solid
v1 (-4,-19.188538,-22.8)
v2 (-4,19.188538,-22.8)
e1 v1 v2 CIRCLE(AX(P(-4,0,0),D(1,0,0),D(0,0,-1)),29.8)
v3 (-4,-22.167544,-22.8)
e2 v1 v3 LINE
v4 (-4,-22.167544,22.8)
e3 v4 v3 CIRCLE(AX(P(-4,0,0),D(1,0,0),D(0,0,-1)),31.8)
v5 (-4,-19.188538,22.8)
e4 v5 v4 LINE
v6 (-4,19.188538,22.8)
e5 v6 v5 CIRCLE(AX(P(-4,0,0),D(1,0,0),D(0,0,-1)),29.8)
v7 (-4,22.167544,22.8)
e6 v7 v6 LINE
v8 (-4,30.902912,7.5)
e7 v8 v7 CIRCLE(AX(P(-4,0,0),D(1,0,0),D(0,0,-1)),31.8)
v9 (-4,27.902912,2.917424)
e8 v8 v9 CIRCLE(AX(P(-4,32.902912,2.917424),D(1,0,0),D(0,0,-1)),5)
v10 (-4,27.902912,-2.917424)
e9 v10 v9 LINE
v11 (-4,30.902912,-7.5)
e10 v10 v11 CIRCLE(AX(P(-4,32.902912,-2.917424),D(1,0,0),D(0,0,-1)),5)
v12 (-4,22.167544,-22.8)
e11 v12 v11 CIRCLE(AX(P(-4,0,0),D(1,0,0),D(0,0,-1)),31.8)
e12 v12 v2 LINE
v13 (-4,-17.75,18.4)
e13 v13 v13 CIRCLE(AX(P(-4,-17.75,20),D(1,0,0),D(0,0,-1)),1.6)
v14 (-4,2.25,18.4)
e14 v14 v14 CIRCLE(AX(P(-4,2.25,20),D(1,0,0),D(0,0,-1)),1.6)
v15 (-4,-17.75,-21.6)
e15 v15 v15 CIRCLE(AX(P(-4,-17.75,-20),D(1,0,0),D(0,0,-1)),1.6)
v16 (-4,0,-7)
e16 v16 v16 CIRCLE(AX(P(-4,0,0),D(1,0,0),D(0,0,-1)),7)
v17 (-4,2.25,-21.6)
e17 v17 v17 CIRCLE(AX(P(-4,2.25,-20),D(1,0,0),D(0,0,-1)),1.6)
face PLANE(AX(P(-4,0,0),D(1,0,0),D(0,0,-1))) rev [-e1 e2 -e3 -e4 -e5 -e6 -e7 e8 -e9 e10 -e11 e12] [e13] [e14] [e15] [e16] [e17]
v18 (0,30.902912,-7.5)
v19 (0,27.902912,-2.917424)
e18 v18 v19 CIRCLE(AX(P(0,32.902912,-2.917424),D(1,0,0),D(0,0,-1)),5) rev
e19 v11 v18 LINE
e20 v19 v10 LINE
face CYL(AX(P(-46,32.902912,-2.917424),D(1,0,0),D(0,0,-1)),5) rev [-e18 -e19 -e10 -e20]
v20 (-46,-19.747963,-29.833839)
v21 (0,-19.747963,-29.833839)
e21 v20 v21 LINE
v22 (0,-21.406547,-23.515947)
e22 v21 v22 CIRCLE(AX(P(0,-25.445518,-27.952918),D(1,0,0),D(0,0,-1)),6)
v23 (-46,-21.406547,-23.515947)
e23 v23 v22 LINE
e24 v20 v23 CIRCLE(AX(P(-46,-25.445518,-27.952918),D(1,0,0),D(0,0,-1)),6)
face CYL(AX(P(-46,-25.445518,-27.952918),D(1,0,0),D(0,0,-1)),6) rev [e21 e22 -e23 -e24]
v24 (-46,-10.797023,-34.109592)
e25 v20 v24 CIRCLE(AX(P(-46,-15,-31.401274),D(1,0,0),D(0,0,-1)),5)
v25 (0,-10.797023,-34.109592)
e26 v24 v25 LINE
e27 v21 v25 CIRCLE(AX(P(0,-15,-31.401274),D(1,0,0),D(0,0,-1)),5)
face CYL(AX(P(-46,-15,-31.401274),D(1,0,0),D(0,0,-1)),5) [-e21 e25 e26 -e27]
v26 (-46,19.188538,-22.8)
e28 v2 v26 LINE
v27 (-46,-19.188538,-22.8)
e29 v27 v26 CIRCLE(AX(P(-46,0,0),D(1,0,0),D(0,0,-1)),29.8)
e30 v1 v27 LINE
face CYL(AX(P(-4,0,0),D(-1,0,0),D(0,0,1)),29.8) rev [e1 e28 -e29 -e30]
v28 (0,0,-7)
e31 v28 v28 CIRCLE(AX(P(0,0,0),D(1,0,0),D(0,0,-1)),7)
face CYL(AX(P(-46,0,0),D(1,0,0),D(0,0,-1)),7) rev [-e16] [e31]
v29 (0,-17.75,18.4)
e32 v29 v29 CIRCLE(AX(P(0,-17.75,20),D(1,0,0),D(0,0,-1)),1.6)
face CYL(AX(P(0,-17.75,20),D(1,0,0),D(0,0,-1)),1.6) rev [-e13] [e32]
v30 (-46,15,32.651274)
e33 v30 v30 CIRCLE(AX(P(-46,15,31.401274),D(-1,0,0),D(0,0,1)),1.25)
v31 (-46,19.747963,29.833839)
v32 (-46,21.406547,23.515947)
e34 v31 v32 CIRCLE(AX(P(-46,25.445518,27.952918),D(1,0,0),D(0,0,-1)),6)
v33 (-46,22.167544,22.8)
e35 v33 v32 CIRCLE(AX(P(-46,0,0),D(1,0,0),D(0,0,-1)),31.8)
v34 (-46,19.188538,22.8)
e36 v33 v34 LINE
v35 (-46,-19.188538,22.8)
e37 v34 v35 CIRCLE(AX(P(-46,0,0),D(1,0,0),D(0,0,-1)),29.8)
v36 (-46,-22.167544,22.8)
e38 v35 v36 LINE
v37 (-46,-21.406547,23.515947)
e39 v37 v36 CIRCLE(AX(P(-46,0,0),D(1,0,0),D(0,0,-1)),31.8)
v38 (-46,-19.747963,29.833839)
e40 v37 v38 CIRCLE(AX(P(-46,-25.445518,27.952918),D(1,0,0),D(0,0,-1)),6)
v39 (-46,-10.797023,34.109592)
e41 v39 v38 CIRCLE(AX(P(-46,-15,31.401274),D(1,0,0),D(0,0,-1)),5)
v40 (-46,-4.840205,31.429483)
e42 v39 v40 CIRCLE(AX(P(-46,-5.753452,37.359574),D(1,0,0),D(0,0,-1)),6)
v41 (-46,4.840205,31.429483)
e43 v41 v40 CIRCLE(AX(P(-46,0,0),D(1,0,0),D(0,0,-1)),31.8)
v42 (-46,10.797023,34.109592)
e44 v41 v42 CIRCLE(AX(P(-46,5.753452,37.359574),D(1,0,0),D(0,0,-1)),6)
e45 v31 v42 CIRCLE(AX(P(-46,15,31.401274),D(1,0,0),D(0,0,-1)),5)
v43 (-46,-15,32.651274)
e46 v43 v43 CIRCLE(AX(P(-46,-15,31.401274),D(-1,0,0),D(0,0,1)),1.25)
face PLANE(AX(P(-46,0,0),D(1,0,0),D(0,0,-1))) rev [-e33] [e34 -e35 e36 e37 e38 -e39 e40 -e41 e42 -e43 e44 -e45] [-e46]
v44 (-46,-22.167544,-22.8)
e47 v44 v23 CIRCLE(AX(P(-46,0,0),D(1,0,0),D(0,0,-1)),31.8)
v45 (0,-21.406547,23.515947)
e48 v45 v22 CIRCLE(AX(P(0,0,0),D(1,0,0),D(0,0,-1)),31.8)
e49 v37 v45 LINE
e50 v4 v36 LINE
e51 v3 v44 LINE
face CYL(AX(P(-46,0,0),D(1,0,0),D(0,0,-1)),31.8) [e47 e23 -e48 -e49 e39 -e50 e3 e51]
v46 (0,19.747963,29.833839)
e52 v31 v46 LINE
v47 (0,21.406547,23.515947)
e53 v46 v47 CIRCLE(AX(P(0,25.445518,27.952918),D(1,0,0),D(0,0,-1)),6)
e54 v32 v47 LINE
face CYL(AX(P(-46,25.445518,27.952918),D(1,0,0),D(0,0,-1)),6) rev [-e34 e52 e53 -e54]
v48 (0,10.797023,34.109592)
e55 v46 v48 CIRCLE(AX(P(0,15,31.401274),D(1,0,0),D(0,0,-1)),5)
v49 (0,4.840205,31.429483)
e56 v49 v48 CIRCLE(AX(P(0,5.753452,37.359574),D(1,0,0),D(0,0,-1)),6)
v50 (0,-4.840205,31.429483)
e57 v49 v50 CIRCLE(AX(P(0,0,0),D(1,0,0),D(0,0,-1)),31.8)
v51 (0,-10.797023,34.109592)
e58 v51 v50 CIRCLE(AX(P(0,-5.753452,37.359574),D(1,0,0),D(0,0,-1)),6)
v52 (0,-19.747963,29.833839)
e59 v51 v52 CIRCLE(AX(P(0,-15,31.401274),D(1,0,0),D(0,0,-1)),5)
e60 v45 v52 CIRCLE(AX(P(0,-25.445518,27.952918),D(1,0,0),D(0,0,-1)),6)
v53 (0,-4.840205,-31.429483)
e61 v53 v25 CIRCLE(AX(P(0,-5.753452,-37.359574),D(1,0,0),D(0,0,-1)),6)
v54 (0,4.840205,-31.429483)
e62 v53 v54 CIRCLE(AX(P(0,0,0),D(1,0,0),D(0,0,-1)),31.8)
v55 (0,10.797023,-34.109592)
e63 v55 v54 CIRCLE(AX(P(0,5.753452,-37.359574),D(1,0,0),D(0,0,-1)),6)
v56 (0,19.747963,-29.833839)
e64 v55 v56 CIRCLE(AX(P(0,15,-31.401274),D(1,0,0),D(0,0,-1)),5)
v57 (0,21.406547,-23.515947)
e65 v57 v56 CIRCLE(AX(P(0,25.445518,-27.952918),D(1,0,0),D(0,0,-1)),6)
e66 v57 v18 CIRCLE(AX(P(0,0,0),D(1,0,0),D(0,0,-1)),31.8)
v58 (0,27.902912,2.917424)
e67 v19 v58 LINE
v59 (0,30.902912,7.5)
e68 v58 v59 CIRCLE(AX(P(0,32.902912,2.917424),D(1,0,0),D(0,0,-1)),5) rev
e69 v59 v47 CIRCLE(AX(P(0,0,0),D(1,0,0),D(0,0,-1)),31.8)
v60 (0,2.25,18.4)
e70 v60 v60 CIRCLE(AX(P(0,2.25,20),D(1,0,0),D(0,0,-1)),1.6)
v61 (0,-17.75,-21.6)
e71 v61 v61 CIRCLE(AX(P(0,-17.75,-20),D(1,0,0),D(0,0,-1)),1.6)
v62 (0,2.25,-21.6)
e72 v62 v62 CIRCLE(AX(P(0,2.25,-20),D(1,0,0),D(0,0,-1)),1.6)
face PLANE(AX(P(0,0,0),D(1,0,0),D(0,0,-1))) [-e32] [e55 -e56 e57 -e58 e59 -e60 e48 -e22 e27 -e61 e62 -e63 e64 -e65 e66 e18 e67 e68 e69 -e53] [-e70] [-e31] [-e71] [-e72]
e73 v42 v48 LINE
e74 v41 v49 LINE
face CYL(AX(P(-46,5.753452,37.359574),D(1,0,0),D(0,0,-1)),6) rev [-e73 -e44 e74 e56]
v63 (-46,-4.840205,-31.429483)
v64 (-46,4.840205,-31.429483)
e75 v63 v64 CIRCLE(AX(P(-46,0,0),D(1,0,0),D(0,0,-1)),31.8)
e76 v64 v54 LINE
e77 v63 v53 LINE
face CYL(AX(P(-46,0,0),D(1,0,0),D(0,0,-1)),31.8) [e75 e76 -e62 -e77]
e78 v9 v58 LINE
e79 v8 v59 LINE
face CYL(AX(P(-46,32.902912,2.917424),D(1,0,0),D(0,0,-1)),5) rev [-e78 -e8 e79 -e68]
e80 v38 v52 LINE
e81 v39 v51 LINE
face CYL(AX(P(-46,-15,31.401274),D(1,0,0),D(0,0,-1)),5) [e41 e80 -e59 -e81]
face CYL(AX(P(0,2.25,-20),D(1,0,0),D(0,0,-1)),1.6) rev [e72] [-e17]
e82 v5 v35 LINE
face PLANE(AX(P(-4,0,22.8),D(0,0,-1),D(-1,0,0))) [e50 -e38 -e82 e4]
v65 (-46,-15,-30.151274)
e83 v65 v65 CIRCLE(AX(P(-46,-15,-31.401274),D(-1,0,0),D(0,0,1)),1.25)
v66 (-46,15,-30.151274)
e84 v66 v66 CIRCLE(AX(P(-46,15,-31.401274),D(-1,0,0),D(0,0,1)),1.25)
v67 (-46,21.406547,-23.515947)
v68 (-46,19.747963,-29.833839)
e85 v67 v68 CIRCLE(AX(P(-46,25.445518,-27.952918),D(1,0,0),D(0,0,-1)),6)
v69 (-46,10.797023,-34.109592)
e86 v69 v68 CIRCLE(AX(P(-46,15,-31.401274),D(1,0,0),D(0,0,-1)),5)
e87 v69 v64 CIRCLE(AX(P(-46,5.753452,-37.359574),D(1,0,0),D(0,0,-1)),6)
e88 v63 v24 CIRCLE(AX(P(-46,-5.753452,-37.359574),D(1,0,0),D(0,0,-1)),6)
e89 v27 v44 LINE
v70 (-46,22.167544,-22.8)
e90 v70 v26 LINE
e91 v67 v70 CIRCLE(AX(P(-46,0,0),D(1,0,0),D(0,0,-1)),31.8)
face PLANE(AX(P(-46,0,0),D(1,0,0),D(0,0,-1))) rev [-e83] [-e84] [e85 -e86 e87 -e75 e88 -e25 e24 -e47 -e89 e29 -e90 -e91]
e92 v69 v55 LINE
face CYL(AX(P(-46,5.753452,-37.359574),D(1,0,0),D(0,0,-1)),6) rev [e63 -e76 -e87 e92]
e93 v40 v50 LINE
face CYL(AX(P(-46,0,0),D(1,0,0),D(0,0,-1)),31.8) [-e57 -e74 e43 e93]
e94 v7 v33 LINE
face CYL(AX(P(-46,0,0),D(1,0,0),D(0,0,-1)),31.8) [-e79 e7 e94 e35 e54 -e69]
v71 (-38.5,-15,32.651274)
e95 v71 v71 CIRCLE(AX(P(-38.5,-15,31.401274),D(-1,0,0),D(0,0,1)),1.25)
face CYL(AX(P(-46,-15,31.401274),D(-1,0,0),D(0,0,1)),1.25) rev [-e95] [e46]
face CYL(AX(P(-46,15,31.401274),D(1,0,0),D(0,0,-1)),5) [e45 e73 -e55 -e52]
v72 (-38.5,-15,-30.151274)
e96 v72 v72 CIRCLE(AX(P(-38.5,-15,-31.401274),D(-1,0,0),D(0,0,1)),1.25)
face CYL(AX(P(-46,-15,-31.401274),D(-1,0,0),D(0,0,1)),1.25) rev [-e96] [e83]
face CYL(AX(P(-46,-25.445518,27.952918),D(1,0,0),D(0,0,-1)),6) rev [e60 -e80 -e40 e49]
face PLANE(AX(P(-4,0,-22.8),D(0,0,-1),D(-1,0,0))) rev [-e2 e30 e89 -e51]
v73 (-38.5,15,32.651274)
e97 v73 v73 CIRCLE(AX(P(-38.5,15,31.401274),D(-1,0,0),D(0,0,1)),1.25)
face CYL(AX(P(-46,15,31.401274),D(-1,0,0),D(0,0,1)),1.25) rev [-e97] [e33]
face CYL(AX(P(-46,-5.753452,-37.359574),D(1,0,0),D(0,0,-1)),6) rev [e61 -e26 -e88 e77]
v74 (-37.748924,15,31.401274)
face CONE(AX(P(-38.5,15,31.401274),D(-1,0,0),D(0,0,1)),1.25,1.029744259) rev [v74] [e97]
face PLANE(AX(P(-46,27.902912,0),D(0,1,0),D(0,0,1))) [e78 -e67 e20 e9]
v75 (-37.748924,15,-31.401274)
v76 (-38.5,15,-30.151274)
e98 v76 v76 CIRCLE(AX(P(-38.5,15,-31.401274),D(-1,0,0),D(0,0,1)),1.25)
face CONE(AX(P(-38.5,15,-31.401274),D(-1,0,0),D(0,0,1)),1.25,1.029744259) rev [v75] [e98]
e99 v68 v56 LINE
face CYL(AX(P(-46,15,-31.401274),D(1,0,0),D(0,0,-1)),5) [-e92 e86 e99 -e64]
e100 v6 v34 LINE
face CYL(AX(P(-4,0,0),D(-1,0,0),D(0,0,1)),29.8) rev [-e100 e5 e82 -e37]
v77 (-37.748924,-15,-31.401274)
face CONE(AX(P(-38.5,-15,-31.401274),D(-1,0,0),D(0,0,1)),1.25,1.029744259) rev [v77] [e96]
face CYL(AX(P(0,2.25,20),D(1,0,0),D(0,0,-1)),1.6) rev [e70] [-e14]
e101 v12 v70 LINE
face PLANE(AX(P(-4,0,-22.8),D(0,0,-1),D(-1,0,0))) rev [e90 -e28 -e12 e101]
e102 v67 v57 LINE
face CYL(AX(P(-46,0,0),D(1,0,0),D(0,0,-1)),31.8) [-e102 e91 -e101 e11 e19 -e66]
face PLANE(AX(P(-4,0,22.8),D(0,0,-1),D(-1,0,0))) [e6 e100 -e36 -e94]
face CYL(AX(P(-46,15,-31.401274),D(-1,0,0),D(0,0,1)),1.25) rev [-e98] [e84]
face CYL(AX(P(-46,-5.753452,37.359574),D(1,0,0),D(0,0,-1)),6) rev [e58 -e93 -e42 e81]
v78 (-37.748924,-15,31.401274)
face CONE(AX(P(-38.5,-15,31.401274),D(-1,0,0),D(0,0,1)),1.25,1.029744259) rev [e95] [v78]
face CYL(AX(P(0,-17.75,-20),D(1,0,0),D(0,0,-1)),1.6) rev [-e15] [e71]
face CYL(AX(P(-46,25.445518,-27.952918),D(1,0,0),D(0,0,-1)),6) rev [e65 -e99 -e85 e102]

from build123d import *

# Parameters (mm, degrees)
SKETCH7_R                = 7
BOSS_EXTRUDE1_DEPTH      = 46
CUT_EXTRUDE1_START       = -46
CUT_EXTRUDE1_OUTLINE_R   = 7
CUT_EXTRUDE1_DEPTH       = 42
M3_CLEARANCE_HOLE1_D     = 3.2
M3_CLEARANCE_HOLE1_DEPTH = 5
M3_CLEARANCE_HOLE1_TIP   = 0.96137699
M3_TAPPED_HOLE1_D        = 2.5
M3_TAPPED_HOLE1_DEPTH    = 7.5
M3_TAPPED_HOLE1_TIP      = 0.751075774
FILLET1_R                = 5


# Read off the part's stored shape, not the designer's step: Cut-Extrude1
with BuildPart() as part:
    # Sketch7 → Boss-Extrude1 (new body)
    with BuildSketch(Plane(origin=(0, 0, 0), x_dir=(0, 0, -1), z_dir=(1, 0, 0))):
        with BuildLine():
            Line((-7.5, 27.902912484), (-7.5, 30.902912484))
            ThreePointArc((-7.5, 30.902912484), (-16.218584434, 27.353199428), (-23.515946886, 21.40654671))
            ThreePointArc((-23.515946886, 21.40654671), (-26.429411238, 19.642162968), (-29.833839376, 19.747962631))
            ThreePointArc((-29.833839376, 19.747962631), (-35.912951138, 17.155172414), (-34.109592252, 10.797023497))
            ThreePointArc((-34.109592252, 10.797023497), (-31.887887506, 8.215289092), (-31.429483161, 4.840205393))
            ThreePointArc((-31.429483161, 4.840205393), (-31.8, 0), (-31.429483161, -4.840205393))
            ThreePointArc((-31.429483161, -4.840205393), (-31.887887506, -8.215289092), (-34.109592252, -10.797023497))
            ThreePointArc((-34.109592252, -10.797023497), (-35.912951138, -17.155172414), (-29.833839376, -19.747962631))
            ThreePointArc((-29.833839376, -19.747962631), (-26.429411238, -19.642162968), (-23.515946886, -21.40654671))
            ThreePointArc((-23.515946886, -21.40654671), (0, -31.8), (23.515946886, -21.40654671))
            ThreePointArc((23.515946886, -21.40654671), (26.429411238, -19.642162968), (29.833839376, -19.747962631))
            ThreePointArc((29.833839376, -19.747962631), (35.912951138, -17.155172414), (34.109592252, -10.797023497))
            ThreePointArc((34.109592252, -10.797023497), (31.887887506, -8.215289092), (31.429483161, -4.840205393))
            ThreePointArc((31.429483161, -4.840205393), (31.8, 0), (31.429483161, 4.840205393))
            ThreePointArc((31.429483161, 4.840205393), (31.887887506, 8.215289092), (34.109592252, 10.797023497))
            ThreePointArc((34.109592252, 10.797023497), (35.912951138, 17.155172414), (29.833839376, 19.747962631))
            ThreePointArc((29.833839376, 19.747962631), (26.429411238, 19.642162968), (23.515946886, 21.40654671))
            ThreePointArc((23.515946886, 21.40654671), (16.218584434, 27.353199428), (7.5, 30.902912484))
            Line((7.5, 30.902912484), (7.5, 27.902912484))
            Line((7.5, 27.902912484), (-7.5, 27.902912484))
        make_face()
        Circle(SKETCH7_R, mode=Mode.SUBTRACT)
    extrude(amount=-BOSS_EXTRUDE1_DEPTH)

    # Cut-Extrude1 outline → Cut-Extrude1 (cut)
    with BuildSketch(Plane(origin=(0, 0, 0), x_dir=(0, 0, -1), z_dir=(1, 0, 0)).offset(CUT_EXTRUDE1_START)):
        with BuildLine():
            ThreePointArc((-22.8, 19.188538246), (-29.8, 0), (-22.8, -19.188538246))
            Line((-22.8, -19.188538246), (-22.8, -22.167543842))
            ThreePointArc((-22.8, -22.167543842), (0, -31.8), (22.8, -22.167543842))
            Line((22.8, -22.167543842), (22.8, -19.188538246))
            ThreePointArc((22.8, -19.188538246), (29.8, 0), (22.8, 19.188538246))
            Line((22.8, 19.188538246), (22.8, 22.167543842))
            ThreePointArc((22.8, 22.167543842), (15.767027822, 27.615952521), (7.5, 30.902912484))
            Line((7.5, 30.902912484), (7.5, 27.902912484))
            Line((7.5, 27.902912484), (-7.5, 27.902912484))
            Line((-7.5, 27.902912484), (-7.5, 30.902912484))
            ThreePointArc((-7.5, 30.902912484), (-15.767027822, 27.615952521), (-22.8, 22.167543842))
            Line((-22.8, 22.167543842), (-22.8, 19.188538246))
        make_face()
        Circle(CUT_EXTRUDE1_OUTLINE_R, mode=Mode.SUBTRACT)
    extrude(amount=CUT_EXTRUDE1_DEPTH, mode=Mode.SUBTRACT)

    # M3 Clearance Hole1
    with Locations(Plane(origin=(0, 0, 0), x_dir=(0, 0, -1), z_dir=(1, 0, 0))):
        with Locations((-20, 2.25), (20, 2.25), (20, -17.75), (-20, -17.75)):
            Hole(M3_CLEARANCE_HOLE1_D / 2, depth=M3_CLEARANCE_HOLE1_DEPTH)
            with Locations((0, 0, -(M3_CLEARANCE_HOLE1_DEPTH + M3_CLEARANCE_HOLE1_TIP / 2))):  # 118° drill point
                Cone(0, M3_CLEARANCE_HOLE1_D / 2, M3_CLEARANCE_HOLE1_TIP, mode=Mode.SUBTRACT)

    # M3 Tapped Hole1
    with Locations(Plane.ZY.offset(46)):
        with Locations((-31.40127386, 15), (-31.40127386, -15), (31.40127386, -15), (31.40127386, 15)):
            Hole(M3_TAPPED_HOLE1_D / 2, depth=M3_TAPPED_HOLE1_DEPTH)
            with Locations((0, 0, -(M3_TAPPED_HOLE1_DEPTH + M3_TAPPED_HOLE1_TIP / 2))):  # 118° drill point
                Cone(0, M3_TAPPED_HOLE1_D / 2, M3_TAPPED_HOLE1_TIP, mode=Mode.SUBTRACT)

    # Fillet1
    # the kernel refuses this fillet: 5 mm, written as the material it adds along each edge
    with BuildSketch(Plane(origin=(0, 27.902912484, 7.5), x_dir=(0, 0, -1), z_dir=(-1, 0, 0))) as fillet1_piece_1:
        with BuildLine():
            CenterArc((4.582575695, -5), FILLET1_R, 90, 66.421821522)
            Line((0, -3), (-0.091651514, -2.96))
            ThreePointArc((-0.091651514, -2.96), (-0.1, -1.5), (-0.1, 0))
            Line((-0.1, 0), (0, 0.1))
            Line((0, 0.1), (4.582575695, 0.1))
            Line((4.582575695, 0.1), (4.582575695, 0))
        make_face()
    extrude(amount=4)
    with BuildSketch(Plane(origin=(0, 27.902912484, -7.5), x_dir=(0, 1, 0), z_dir=(-1, 0, 0))) as fillet1_piece_2:
        with BuildLine():
            CenterArc((5, -4.582575695), FILLET1_R, 113.578178478, 66.421821522)
            Line((0, -4.582575695), (-0.1, -4.582575695))
            Line((-0.1, -4.582575695), (-0.1, 0))
            Line((-0.1, 0), (0, 0.1))
            ThreePointArc((0, 0.1), (1.5, 0.1), (2.96, 0.091651514))
            Line((2.96, 0.091651514), (3, 0))
        make_face()
    extrude(amount=4)


solid = part.part
